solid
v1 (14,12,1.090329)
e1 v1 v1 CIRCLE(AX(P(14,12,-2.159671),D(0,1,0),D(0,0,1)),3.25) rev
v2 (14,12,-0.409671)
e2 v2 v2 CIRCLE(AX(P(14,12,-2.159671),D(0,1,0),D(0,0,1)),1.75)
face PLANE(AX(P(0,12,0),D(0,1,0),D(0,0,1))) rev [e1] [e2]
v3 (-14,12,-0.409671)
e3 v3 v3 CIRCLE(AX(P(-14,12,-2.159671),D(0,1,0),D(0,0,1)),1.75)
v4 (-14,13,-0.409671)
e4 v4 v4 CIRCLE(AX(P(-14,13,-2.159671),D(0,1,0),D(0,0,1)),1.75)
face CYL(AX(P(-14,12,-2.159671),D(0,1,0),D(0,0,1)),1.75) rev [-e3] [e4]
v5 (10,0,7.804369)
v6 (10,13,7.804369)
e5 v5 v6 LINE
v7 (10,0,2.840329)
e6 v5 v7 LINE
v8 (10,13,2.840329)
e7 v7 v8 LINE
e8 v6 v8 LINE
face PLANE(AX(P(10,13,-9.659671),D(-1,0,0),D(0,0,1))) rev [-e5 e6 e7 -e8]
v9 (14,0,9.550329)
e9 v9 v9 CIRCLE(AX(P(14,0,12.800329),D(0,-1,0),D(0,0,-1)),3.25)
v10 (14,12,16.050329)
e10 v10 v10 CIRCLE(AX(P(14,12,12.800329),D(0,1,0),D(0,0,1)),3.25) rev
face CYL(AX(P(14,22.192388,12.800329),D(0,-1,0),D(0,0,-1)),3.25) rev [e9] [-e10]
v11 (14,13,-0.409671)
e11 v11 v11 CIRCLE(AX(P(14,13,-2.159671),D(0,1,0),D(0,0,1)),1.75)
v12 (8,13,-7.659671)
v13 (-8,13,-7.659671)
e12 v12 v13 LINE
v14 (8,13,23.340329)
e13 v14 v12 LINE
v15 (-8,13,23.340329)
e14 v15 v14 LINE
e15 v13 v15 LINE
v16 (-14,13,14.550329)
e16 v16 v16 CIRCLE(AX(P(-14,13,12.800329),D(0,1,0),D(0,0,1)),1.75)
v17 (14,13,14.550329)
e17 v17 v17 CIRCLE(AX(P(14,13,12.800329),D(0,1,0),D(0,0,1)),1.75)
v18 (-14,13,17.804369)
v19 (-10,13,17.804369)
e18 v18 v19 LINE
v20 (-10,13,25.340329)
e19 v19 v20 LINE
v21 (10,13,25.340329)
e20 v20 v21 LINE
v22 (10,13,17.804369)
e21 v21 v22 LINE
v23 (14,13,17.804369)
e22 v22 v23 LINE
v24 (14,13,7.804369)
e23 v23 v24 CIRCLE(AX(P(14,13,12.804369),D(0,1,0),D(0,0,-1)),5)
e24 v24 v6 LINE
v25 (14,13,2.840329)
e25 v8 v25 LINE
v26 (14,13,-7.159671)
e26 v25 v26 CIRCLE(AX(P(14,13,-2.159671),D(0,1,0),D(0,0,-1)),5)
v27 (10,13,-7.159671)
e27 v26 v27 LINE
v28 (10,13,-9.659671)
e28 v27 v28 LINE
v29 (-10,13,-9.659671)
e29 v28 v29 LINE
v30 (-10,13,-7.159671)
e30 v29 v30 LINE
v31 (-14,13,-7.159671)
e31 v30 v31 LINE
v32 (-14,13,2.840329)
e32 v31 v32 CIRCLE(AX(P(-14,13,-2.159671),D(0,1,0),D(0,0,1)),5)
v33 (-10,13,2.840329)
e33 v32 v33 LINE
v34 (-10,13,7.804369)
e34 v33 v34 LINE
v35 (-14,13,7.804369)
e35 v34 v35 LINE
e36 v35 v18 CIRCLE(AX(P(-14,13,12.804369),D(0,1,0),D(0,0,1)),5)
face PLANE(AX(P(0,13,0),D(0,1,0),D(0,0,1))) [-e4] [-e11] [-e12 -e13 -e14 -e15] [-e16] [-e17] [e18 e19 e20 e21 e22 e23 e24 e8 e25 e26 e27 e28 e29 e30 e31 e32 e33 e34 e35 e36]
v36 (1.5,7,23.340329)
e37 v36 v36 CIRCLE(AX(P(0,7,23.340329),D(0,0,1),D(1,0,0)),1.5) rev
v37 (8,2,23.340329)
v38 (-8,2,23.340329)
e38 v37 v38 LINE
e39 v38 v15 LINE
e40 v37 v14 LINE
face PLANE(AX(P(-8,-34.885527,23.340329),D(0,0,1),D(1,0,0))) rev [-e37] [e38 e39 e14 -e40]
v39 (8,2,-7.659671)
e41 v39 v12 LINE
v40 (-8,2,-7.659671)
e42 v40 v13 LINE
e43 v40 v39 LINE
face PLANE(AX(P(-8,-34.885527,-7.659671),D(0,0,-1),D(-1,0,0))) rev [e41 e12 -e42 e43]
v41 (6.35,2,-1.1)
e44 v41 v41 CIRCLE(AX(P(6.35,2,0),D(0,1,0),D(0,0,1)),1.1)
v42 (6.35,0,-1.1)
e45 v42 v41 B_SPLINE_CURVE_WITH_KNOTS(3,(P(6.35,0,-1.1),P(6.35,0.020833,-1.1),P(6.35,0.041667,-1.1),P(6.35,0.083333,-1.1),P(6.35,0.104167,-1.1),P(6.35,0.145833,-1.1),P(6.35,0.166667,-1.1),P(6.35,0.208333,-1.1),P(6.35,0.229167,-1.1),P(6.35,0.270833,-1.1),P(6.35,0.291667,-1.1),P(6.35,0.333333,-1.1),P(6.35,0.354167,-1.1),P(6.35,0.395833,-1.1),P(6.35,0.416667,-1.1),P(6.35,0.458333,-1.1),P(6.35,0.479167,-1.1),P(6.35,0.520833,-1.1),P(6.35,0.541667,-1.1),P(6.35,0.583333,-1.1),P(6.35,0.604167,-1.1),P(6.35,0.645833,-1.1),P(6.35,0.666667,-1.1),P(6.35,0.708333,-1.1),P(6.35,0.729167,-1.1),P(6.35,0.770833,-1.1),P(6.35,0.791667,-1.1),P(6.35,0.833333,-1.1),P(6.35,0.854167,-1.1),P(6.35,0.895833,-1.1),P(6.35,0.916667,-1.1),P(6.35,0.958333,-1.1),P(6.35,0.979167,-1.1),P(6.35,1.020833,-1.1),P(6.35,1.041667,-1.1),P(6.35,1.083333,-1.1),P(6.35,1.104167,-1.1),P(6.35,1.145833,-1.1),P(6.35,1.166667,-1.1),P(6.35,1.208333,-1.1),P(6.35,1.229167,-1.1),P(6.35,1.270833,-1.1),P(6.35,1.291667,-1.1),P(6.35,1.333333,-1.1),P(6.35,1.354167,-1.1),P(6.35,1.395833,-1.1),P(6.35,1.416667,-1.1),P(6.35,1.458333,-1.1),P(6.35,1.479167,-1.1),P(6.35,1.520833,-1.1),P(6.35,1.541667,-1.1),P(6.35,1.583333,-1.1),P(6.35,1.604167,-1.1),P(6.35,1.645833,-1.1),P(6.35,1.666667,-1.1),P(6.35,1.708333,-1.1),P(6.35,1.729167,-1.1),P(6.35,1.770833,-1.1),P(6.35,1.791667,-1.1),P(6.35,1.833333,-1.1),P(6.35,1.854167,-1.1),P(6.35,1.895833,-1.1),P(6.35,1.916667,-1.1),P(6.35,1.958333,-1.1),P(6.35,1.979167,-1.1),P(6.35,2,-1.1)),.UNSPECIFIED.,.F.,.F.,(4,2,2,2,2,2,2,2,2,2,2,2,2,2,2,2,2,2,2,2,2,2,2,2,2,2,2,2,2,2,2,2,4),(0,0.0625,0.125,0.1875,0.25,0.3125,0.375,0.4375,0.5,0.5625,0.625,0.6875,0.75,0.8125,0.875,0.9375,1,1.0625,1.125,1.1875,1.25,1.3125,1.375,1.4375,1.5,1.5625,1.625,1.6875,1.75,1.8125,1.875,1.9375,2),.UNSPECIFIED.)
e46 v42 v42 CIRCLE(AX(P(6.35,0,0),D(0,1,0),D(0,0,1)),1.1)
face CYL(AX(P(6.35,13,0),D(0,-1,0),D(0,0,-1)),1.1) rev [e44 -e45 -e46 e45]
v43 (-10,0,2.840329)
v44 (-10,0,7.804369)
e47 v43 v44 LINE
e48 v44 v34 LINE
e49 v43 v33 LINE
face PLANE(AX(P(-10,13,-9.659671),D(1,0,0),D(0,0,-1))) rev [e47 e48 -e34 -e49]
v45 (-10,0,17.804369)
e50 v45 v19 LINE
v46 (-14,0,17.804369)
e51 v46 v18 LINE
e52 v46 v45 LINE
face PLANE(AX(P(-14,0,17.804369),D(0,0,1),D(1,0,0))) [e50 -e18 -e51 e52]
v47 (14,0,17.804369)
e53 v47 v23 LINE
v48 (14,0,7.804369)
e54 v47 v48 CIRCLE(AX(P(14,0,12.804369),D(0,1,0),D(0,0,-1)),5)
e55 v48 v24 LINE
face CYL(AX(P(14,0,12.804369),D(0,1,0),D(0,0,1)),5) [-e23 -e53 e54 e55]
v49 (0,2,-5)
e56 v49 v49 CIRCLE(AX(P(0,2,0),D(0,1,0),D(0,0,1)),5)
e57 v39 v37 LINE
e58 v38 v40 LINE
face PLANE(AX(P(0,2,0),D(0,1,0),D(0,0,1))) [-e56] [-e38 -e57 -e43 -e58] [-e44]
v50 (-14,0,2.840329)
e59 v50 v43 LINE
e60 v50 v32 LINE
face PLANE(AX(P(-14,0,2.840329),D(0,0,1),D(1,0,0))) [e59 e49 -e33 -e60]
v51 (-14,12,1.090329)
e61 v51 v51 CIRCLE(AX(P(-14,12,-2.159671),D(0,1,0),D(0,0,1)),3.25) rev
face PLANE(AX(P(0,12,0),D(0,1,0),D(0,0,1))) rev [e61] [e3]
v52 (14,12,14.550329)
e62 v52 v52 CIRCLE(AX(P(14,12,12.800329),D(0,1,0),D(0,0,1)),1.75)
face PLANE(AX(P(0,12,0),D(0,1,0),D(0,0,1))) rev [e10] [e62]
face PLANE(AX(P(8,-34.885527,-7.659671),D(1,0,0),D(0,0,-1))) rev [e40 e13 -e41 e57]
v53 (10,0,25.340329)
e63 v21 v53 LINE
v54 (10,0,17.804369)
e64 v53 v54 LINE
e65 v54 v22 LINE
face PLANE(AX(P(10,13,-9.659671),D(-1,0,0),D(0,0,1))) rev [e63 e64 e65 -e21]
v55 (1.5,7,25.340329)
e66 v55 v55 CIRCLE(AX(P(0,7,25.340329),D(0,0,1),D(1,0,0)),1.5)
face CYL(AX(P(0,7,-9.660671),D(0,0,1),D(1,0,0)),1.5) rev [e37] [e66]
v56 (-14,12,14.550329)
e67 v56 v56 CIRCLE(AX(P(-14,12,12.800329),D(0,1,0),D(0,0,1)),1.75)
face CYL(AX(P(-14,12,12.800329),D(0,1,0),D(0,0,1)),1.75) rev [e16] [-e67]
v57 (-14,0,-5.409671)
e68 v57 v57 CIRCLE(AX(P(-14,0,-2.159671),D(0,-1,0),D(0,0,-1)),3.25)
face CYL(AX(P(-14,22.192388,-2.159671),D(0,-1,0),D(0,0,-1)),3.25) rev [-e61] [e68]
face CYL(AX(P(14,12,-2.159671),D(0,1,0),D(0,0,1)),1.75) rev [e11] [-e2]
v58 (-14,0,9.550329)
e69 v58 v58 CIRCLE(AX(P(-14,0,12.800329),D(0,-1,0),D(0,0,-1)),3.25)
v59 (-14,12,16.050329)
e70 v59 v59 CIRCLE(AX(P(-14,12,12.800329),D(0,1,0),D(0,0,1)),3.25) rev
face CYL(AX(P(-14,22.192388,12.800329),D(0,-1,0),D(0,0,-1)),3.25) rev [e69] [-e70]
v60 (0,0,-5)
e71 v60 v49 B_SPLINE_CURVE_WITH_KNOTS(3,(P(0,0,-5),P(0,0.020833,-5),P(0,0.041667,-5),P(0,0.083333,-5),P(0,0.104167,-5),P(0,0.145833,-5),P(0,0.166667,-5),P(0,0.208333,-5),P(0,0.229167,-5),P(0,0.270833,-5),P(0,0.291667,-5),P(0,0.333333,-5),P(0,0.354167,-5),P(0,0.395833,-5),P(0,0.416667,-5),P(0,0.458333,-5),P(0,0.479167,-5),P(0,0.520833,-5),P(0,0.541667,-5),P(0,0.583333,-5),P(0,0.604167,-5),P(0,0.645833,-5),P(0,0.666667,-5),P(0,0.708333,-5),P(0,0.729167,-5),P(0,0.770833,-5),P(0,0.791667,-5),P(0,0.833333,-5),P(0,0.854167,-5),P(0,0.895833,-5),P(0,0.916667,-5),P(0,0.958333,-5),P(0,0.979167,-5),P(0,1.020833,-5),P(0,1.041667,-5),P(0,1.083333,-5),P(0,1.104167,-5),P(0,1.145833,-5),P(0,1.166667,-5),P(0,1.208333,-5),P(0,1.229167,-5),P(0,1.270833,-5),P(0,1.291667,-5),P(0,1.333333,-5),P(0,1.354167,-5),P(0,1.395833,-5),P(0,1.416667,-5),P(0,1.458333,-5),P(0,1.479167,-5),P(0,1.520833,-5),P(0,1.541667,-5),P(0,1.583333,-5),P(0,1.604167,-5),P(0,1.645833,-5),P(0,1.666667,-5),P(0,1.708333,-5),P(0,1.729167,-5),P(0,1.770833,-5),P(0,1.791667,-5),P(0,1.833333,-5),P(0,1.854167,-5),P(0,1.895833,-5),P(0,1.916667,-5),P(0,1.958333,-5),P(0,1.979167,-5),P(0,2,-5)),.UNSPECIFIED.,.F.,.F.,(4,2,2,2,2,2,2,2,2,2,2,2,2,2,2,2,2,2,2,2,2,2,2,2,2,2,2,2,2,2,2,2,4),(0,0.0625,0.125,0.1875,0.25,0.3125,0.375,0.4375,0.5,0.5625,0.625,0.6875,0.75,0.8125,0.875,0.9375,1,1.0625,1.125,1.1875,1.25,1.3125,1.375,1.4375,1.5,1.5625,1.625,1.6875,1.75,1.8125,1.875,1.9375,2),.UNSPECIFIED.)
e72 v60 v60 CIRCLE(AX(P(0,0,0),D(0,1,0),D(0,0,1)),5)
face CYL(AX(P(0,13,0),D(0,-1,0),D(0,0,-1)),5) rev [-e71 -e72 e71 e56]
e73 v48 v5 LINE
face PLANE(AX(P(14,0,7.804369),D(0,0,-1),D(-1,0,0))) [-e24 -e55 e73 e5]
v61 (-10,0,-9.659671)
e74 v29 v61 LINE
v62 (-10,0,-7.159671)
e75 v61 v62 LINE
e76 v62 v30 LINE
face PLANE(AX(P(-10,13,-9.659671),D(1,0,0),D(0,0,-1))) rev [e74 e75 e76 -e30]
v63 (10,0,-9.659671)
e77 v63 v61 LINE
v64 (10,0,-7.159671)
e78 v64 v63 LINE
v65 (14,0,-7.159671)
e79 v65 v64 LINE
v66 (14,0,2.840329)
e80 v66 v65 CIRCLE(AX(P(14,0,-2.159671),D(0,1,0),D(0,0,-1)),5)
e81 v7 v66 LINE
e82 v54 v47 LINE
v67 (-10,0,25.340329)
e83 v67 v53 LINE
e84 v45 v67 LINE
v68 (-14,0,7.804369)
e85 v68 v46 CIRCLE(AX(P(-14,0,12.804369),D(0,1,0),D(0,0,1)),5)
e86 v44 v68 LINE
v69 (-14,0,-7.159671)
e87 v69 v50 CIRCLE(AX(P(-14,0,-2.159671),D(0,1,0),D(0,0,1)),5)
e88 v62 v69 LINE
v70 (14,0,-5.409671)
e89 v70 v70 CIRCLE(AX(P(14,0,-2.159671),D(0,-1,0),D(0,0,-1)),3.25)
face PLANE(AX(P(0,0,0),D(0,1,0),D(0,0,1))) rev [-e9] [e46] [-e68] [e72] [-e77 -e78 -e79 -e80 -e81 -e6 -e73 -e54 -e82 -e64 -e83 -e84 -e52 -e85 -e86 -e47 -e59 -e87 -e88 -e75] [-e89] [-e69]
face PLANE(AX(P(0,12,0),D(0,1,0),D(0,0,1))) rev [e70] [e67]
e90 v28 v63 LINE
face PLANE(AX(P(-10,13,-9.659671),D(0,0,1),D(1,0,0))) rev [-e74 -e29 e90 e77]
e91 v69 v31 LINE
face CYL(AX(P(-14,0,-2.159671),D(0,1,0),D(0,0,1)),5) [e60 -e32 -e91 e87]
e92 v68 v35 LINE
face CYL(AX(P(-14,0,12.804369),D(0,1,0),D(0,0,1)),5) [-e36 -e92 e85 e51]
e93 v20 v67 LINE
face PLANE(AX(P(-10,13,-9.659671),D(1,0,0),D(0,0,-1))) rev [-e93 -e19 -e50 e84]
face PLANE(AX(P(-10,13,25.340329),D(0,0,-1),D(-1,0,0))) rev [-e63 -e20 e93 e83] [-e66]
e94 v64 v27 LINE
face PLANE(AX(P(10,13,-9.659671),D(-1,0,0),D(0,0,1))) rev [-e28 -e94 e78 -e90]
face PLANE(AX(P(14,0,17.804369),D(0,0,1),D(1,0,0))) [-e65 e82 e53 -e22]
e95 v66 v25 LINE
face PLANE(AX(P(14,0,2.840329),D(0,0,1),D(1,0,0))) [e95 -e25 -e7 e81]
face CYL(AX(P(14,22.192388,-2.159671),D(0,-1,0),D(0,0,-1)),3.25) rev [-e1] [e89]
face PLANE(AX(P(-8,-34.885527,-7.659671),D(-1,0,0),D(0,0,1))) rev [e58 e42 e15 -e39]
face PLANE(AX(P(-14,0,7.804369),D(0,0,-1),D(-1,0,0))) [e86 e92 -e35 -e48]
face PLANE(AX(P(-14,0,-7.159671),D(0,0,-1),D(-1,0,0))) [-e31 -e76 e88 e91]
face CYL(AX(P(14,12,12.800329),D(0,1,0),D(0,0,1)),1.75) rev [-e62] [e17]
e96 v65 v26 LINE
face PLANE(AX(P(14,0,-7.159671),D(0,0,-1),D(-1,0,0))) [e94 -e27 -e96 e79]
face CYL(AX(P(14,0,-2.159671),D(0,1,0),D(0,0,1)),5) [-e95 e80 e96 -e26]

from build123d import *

# Parameters (mm, degrees)
SKETCH1_W              = 20
SKETCH1_H              = 35
SKETCH1_R              = 5
SKETCH1_R_2            = 1.1
BOSS_EXTRUDE1_DEPTH    = 13
SKETCH5_W              = 16
SKETCH5_H              = 31
CUT_EXTRUDE1_DEPTH     = 11
CUT_EXTRUDE2_REACH     = 40.652
SKETCH7_R              = 1.5
BOSS_EXTRUDE3_DEPTH    = 13
SKETCH11_R             = 3.25
CUT_EXTRUDE4_DEPTH     = 12
CUT_EXTRUDE5_START     = 12
CUT_EXTRUDE5_OUTLINE_R = 1.75
CUT_EXTRUDE5_DEPTH     = 1


# Read off the part's stored shape, not the designer's step: Cut-Extrude5
with BuildPart() as part:
    # Sketch1 → Boss-Extrude1 (new body)
    with BuildSketch(Plane(origin=(0, 0, 0), x_dir=(1, 0, 0), z_dir=(0, 1, 0))):
        with Locations((0, -7.840328725)):
            Rectangle(SKETCH1_W, SKETCH1_H)
        with Locations(Location((0, 0, 0), (0, 0, 90))):
            Circle(SKETCH1_R, mode=Mode.SUBTRACT)
        with Locations(Location((6.35, 0, 0), (0, 0, 90))):
            Circle(SKETCH1_R_2, mode=Mode.SUBTRACT)
    extrude(amount=BOSS_EXTRUDE1_DEPTH)

    # Sketch5 → Cut-Extrude1 (cut)
    with BuildSketch(Plane(origin=(0, 13, 0), x_dir=(1, 0, 0), z_dir=(0, 1, 0))):
        with Locations((0, -7.840328725)):
            Rectangle(SKETCH5_W, SKETCH5_H)
    extrude(amount=-CUT_EXTRUDE1_DEPTH, mode=Mode.SUBTRACT)

    # Sketch7 → Cut-Extrude2 (cut, up to next)
    with BuildSketch(Plane.XY.offset(25.340328725), mode=Mode.PRIVATE) as cut_extrude2_sk1:
        with Locations((0, 7)):
            Circle(SKETCH7_R)
    cut_extrude2_tool1 = extrude(cut_extrude2_sk1.sketch, amount=-CUT_EXTRUDE2_REACH, mode=Mode.PRIVATE) & part.part
    add(cut_extrude2_tool1.solids().sort_by_distance((0, 7, 25.340329))[0], mode=Mode.SUBTRACT)

    # Sketch9 → Boss-Extrude3 (add, through all)
    with BuildSketch(Plane(origin=(0, 13, 0), x_dir=(1, 0, 0), z_dir=(0, 1, 0))):
        with BuildLine():
            Line((-14, 7.159671275), (-10, 7.159671275))
            Line((-10, 7.159671275), (-10, -2.840328725))
            Line((-10, -2.840328725), (-14, -2.840328725))
            ThreePointArc((-14, -2.840328725), (-19, 2.159671275), (-14, 7.159671275))
        make_face()
        with BuildLine():
            Line((-14, -7.804369497), (-10, -7.804369497))
            Line((-10, -7.804369497), (-10, -17.804369497))
            Line((-10, -17.804369497), (-14, -17.804369497))
            ThreePointArc((-14, -17.804369497), (-19, -12.804369497), (-14, -7.804369497))
        make_face()
        with BuildLine():
            Line((10, -7.804369497), (10, -17.804369497))
            Line((10, -17.804369497), (14, -17.804369497))
            ThreePointArc((14, -17.804369497), (19, -12.804369497), (14, -7.804369497))
            Line((14, -7.804369497), (10, -7.804369497))
        make_face()
        with BuildLine():
            Line((10, 7.159671275), (10, -2.840328725))
            Line((10, -2.840328725), (14, -2.840328725))
            ThreePointArc((14, -2.840328725), (19, 2.159671275), (14, 7.159671275))
            Line((14, 7.159671275), (10, 7.159671275))
        make_face()
    extrude(amount=-BOSS_EXTRUDE3_DEPTH)

    # Sketch11 → Cut-Extrude4 (cut)
    with BuildSketch(Plane.XZ):
        with Locations(Location((-14, 12.800328725, 0), (0, 0, 270))):
            Circle(SKETCH11_R)
        with Locations(Location((-14, -2.159671275, 0), (0, 0, 270))):
            Circle(SKETCH11_R)
        with Locations(Location((14, 12.800328725, 0), (0, 0, 270))):
            Circle(SKETCH11_R)
        with Locations(Location((14, -2.159671275, 0), (0, 0, 270))):
            Circle(SKETCH11_R)
    extrude(amount=-CUT_EXTRUDE4_DEPTH, mode=Mode.SUBTRACT)

    # Cut-Extrude5 outline → Cut-Extrude5 (cut)
    with BuildSketch(Plane(origin=(0, 0, 0), x_dir=(1, 0, 0), z_dir=(0, 1, 0)).offset(CUT_EXTRUDE5_START)):
        with Locations((-14, 2.159671275)):
            Circle(CUT_EXTRUDE5_OUTLINE_R)
        with Locations((14, -12.800328725)):
            Circle(CUT_EXTRUDE5_OUTLINE_R)
        with Locations((14, 2.159671275)):
            Circle(CUT_EXTRUDE5_OUTLINE_R)
        with Locations((-14, -12.800328725)):
            Circle(CUT_EXTRUDE5_OUTLINE_R)
    extrude(amount=CUT_EXTRUDE5_DEPTH, mode=Mode.SUBTRACT)


solid = part.part
